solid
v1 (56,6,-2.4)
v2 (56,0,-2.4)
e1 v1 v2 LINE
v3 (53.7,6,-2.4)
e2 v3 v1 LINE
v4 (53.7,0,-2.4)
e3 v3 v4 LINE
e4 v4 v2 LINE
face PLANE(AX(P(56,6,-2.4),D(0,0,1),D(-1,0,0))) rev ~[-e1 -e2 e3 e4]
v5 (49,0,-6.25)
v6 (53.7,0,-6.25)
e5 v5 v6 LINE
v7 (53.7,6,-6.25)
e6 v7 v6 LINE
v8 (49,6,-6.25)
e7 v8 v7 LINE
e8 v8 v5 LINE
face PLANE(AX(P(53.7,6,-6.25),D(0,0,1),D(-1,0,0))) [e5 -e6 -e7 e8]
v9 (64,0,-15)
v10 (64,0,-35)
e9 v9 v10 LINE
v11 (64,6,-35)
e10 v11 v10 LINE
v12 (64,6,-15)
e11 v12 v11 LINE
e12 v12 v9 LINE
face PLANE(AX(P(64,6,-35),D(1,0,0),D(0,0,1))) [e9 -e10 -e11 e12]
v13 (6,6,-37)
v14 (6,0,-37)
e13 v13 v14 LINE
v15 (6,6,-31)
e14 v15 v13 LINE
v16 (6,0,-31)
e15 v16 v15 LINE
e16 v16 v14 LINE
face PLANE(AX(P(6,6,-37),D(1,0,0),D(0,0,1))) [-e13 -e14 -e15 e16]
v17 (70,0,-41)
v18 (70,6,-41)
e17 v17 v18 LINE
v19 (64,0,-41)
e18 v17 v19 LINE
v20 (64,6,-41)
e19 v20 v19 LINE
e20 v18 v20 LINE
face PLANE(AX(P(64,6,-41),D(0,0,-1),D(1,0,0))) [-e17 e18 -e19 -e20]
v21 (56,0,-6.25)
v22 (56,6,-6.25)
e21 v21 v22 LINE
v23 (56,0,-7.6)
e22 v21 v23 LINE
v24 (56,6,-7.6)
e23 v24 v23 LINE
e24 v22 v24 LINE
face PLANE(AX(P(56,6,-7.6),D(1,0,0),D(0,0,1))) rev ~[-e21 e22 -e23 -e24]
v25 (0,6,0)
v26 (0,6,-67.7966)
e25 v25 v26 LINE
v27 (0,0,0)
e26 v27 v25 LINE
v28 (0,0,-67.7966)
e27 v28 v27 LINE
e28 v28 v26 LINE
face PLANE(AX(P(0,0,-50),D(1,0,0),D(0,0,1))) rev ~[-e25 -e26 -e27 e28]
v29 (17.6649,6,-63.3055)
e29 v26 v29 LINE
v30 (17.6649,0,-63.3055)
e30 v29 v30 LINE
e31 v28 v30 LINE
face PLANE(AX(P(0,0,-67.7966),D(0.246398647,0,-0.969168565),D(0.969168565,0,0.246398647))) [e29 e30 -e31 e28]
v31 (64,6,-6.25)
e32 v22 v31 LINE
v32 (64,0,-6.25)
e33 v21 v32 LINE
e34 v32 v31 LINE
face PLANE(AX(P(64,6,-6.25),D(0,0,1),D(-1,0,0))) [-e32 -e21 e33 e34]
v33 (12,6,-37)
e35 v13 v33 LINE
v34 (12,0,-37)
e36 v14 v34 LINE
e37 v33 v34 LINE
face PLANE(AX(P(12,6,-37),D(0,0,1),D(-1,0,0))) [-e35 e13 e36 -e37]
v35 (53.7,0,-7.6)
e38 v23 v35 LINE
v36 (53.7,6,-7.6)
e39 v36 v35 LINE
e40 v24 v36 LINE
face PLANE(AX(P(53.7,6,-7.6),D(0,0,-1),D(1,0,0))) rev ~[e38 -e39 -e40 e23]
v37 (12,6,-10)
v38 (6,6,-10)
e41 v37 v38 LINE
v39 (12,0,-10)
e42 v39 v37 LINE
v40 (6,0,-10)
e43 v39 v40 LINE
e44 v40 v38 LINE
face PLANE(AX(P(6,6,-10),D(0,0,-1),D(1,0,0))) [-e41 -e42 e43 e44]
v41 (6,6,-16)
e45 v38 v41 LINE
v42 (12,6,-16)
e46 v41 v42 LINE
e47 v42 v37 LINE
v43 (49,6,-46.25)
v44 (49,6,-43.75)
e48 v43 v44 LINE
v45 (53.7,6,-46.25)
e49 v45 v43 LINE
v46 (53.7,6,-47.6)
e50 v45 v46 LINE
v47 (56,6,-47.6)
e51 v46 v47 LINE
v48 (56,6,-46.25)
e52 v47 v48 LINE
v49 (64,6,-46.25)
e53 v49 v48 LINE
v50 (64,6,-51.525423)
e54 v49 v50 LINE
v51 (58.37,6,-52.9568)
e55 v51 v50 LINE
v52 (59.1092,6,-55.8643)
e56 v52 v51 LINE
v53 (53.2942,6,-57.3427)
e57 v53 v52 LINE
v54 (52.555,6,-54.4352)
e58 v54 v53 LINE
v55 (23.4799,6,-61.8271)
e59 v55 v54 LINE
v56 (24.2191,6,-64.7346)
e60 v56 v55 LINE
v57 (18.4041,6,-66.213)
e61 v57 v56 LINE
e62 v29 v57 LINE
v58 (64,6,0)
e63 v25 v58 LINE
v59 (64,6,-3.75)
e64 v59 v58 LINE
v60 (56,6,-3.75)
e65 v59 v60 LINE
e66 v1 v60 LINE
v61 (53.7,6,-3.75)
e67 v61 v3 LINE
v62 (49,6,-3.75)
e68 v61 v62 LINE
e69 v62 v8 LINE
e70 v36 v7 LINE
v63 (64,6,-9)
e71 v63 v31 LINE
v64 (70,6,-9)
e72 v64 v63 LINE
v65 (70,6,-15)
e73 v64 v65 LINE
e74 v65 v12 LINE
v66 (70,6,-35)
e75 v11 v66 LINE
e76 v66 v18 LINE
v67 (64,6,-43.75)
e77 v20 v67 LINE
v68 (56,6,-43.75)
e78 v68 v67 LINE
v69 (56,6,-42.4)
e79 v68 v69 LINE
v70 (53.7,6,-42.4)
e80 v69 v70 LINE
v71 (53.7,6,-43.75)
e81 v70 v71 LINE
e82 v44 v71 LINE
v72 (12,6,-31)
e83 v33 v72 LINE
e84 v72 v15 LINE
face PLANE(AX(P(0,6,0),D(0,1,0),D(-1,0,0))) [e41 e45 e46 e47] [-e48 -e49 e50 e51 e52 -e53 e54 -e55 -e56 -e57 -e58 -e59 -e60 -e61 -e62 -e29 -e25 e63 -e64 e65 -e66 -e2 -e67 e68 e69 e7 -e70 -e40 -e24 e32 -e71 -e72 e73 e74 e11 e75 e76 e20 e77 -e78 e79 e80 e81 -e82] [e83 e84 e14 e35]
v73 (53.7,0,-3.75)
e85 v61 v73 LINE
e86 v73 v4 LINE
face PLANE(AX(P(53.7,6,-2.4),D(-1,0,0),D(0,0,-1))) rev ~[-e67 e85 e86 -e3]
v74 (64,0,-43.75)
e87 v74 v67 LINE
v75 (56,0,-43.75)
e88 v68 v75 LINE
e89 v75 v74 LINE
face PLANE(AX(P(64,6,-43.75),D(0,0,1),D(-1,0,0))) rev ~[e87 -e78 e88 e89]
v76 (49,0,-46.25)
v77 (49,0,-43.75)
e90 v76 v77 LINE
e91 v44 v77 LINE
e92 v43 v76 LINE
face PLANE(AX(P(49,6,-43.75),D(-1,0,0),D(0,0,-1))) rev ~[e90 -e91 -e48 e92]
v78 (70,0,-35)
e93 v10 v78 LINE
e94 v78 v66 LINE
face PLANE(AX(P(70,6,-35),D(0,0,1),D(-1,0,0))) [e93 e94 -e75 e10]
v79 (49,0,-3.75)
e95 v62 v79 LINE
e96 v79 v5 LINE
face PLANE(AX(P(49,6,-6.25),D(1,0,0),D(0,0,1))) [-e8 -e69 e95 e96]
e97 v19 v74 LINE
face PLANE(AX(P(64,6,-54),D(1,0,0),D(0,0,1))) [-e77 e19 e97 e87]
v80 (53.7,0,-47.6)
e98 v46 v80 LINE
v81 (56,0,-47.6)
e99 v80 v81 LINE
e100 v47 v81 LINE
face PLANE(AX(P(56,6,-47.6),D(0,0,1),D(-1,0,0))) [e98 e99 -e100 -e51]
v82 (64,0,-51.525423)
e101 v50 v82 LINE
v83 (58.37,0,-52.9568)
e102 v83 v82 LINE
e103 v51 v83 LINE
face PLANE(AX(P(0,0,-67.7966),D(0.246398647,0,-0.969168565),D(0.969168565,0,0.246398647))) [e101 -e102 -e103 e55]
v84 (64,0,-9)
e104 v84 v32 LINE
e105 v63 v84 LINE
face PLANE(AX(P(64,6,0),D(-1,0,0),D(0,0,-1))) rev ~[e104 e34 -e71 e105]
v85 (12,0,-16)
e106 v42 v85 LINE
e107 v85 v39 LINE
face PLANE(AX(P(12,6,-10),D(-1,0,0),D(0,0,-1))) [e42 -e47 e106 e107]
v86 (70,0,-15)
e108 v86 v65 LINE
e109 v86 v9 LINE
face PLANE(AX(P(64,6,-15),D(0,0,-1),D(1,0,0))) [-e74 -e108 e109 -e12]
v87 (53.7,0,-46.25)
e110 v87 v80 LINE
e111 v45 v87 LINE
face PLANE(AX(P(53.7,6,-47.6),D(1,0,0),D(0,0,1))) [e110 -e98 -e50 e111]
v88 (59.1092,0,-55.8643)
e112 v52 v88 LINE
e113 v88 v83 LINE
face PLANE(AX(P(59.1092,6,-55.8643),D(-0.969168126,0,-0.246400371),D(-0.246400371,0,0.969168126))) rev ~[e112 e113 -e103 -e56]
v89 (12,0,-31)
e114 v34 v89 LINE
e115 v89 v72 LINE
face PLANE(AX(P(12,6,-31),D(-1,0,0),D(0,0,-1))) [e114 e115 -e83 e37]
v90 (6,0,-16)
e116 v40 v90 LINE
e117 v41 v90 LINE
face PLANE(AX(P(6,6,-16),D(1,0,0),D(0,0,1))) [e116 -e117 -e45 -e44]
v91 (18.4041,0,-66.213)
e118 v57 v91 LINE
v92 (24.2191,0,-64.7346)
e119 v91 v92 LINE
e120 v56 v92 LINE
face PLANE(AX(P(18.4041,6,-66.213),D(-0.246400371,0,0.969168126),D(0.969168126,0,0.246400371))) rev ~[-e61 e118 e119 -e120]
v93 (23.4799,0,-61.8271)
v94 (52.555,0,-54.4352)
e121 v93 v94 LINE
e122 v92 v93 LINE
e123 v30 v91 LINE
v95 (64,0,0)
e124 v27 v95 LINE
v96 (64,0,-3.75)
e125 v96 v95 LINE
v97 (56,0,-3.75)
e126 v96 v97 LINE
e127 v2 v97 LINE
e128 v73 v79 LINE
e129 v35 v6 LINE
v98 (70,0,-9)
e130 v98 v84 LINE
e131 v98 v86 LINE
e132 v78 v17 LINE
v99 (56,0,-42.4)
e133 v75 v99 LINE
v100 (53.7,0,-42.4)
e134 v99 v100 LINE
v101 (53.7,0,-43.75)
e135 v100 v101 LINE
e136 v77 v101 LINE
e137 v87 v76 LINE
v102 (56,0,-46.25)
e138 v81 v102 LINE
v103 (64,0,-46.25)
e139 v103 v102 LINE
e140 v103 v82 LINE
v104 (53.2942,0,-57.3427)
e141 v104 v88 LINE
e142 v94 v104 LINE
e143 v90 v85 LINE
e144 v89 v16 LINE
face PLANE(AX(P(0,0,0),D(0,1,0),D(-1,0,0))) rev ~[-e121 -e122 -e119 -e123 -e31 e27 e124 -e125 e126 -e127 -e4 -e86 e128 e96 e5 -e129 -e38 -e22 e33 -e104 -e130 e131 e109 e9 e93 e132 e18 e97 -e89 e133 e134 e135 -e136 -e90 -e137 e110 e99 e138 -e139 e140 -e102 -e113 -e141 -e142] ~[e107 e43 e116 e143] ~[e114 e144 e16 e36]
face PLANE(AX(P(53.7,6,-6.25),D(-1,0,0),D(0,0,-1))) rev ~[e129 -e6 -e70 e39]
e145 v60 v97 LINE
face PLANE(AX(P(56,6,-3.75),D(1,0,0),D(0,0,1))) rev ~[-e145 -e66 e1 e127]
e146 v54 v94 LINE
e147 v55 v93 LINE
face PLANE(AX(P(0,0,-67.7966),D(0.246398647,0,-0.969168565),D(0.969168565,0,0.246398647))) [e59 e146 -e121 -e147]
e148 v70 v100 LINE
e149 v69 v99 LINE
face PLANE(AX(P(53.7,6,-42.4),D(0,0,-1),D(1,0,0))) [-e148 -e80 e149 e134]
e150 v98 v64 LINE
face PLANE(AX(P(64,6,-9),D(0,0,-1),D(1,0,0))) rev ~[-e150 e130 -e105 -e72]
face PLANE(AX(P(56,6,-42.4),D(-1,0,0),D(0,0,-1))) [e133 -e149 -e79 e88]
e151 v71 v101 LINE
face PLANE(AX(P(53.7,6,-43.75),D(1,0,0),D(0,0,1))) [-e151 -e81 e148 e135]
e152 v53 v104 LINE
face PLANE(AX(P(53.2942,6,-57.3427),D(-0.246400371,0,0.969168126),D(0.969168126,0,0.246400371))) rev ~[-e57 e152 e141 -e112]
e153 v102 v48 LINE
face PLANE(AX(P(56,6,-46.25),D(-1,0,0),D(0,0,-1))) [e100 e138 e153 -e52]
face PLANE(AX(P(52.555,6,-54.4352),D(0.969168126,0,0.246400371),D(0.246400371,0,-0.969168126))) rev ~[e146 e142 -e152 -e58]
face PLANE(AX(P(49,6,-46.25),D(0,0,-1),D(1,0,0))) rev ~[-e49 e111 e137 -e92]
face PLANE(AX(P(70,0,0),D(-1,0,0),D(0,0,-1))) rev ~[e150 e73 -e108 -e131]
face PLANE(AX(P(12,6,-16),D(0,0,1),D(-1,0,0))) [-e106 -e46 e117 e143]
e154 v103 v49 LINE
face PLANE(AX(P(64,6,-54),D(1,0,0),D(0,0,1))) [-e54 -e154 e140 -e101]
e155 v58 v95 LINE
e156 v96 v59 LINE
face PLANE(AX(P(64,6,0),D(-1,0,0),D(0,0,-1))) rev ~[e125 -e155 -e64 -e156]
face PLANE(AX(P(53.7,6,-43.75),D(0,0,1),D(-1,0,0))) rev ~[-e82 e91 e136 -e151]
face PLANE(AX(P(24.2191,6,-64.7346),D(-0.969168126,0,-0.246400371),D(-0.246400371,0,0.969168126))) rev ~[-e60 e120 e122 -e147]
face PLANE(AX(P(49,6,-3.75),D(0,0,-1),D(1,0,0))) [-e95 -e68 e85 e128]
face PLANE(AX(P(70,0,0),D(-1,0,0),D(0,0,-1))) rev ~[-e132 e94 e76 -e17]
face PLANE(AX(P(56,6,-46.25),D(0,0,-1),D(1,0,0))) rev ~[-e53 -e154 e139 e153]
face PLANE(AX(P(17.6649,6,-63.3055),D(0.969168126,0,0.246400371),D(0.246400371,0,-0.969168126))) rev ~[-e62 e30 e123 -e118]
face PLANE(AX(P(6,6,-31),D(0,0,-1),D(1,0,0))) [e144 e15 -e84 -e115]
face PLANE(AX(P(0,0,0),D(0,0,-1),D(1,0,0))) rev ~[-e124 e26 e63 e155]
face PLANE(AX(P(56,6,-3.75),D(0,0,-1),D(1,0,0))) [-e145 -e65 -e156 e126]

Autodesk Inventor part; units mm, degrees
ref_plane "YZ Plane" through (0, 0, 0) normal (1, 0, 0) x (0, 1, 0)
ref_plane "XZ Plane" through (0, 0, 0) normal (0, 1, 0) x (-1, 0, 0)
ref_plane "XY Plane" through (0, 0, 0) normal (0, 0, 1) x (1, 0, 0)
sketch "Sketch1" plane through (0, 0, 0) normal (0, 1, 0) x (-1, 0, 0)
  line L0 (0, 0) -> (-70, 0)
  line L1 (-70, 0) -> (-70, -50)
  line L2 (-70, -50) -> (0, -50)
  line L3 (0, -50) -> (0, 0)
  line L4 (0, -50) -> (0, -67.7966)
  line L5 (0, -67.7966) -> (-70, -50)
  dimension "d0" = 70
  dimension "d1" = 50
  dimension "d45" = 14.264
extrude "Extrusion1" add sketch "Sketch1" along normal blind 6
sketch "Sketch2" plane through (0, 6, 0) normal (0, 1, 0) x (1, 0, 0)
  line L0 (70, 50) -> (58.37, 52.9568) construction
  line L1 (70, 50) -> (0, 67.7966) construction
  line L2 (58.37, 52.9568) -> (52.555, 54.4352)
  line L3 (52.555, 54.4352) -> (53.2942, 57.3427)
  line L4 (53.2942, 57.3427) -> (59.1092, 55.8643)
  line L5 (59.1092, 55.8643) -> (58.37, 52.9568)
  line L6 (23.4799, 61.8271) -> (17.6649, 63.3055)
  line L7 (17.6649, 63.3055) -> (18.4041, 66.213)
  line L8 (18.4041, 66.213) -> (24.2191, 64.7346)
  line L9 (24.2191, 64.7346) -> (23.4799, 61.8271)
  point P0 (0, 0)
  dimension "d9" = 12
  dimension "d10" = 6
  dimension "d11" = 3
  dimension "d15" = 6
  dimension "d16" = 3
  dimension "d17" = 30
extrude "Extrusion2" add sketch "Sketch2" against normal blind 6
sketch "Sketch3" plane through (0, 6, 0) normal (0, 1, 0) x (1, 0, 0)
  line L0 (70, 0) -> (70, 50) projected
  line L1 (70, 54) -> (64, 54)
  line L2 (64, 54) -> (64, 41)
  line L3 (64, 41) -> (70, 41)
  line L4 (70, 41) -> (70, 54)
  line L5 (70, 0) -> (64, 0)
  line L6 (64, 0) -> (64, 9)
  line L7 (64, 9) -> (70, 9)
  line L8 (70, 9) -> (70, 0)
  line L9 (70, 35) -> (64, 35)
  line L10 (64, 35) -> (64, 15)
  line L11 (64, 15) -> (70, 15)
  line L12 (70, 15) -> (70, 35)
  point P0 (0, 0)
  dimension "d18" = 6
  dimension "d20" = 6
  dimension "d21" = 9
  dimension "d22" = 6
  dimension "d23" = 6
  dimension "d27" = 20
  dimension "d36" = 13
extrude "Extrusion3" cut sketch "Sketch3" along normal through all both and the other way through all
sketch "Sketch4" plane through (0, 6, 0) normal (0, 1, 0) x (1, 0, 0)
  line L0 (64, 0) -> (64, 9) projected
  line L1 (64, 6.25) -> (56, 6.25)
  line L2 (49, 6.25) -> (49, 3.75)
  line L3 (49, 3.75) -> (53.7, 3.75)
  line L4 (64, 3.75) -> (64, 6.25)
  line L5 (64, 9) -> (70, 9) projected
  line L6 (64, 43.75) -> (56, 43.75)
  line L7 (49, 43.75) -> (49, 46.25)
  line L8 (49, 46.25) -> (53.7, 46.25)
  line L9 (64, 46.25) -> (64, 43.75)
  line L10 (70, 41) -> (64, 41) projected
  line L11 (64, 41) -> (64, 51.5254) projected
  line L12 (56, 47.6) -> (53.7, 47.6)
  line L13 (53.7, 47.6) -> (53.7, 46.25)
  line L14 (53.7, 42.4) -> (56, 42.4)
  line L15 (56, 42.4) -> (56, 43.75)
  line L16 (53.7, 7.6) -> (56, 7.6)
  line L17 (56, 7.6) -> (56, 6.25)
  line L18 (56, 2.4) -> (53.7, 2.4)
  line L19 (53.7, 2.4) -> (53.7, 3.75)
  line L20 (53.7, 6.25) -> (53.7, 7.6)
  line L21 (53.7, 3.75) -> (53.7, 6.25) construction
  line L22 (56, 6.25) -> (56, 3.75) construction
  line L23 (56, 3.75) -> (56, 2.4)
  line L24 (56, 3.75) -> (64, 3.75)
  line L25 (53.7, 3.75) -> (56, 3.75) construction
  line L26 (56, 6.25) -> (53.7, 6.25) construction
  line L27 (53.7, 6.25) -> (49, 6.25)
  line L28 (53.7, 43.75) -> (53.7, 42.4)
  line L29 (53.7, 46.25) -> (53.7, 43.75) construction
  line L30 (53.7, 43.75) -> (49, 43.75)
  line L31 (56, 43.75) -> (53.7, 43.75) construction
  line L32 (56, 46.25) -> (56, 47.6)
  line L33 (56, 43.75) -> (56, 46.25) construction
  line L34 (53.7, 46.25) -> (56, 46.25) construction
  line L35 (56, 46.25) -> (64, 46.25)
  line L36 (6, 10) -> (12, 10)
  line L37 (12, 10) -> (12, 16)
  line L38 (12, 16) -> (6, 16)
  line L39 (6, 16) -> (6, 10)
  line L40 (6, 31) -> (12, 31)
  line L41 (12, 31) -> (12, 37)
  line L42 (12, 37) -> (6, 37)
  line L43 (6, 37) -> (6, 31)
  line L44 (0, 0) -> (64, 0) projected
  line L45 (0, 67.7966) -> (0, 0) projected
  point P0 (64, 45)
  dimension "d37" = 15
  dimension "d38" = 2.5
  dimension "d42" = 15
  dimension "d43" = 2.5
  dimension "d44" = 2.75
  dimension "d46" = 2.75
  dimension "d47" = 5.2
  dimension "d48" = 2.3
  dimension "d49" = 5.2
  dimension "d50" = 8
  dimension "d51" = 8
  dimension "d52" = 6
  dimension "d53" = 6
  dimension "d54" = 6
  dimension "d55" = 6
  dimension "d56" = 10
  dimension "d57" = 6
  dimension "d58" = 15
extrude "Extrusion4" cut sketch "Sketch4" along normal through all both and the other way through all
equation "\"d15\" = d10"
equation "\"d16\" = d11"
equation "\"d18\" = d20"
equation "\"d42\" = d37"
equation "\"d43\" = d38"
equation "\"d44\" = d46"
equation "\"d50\" = d51"
equation "\"d54\" = d52"
properties part number "pinball-case-left-wal-scaledl"
